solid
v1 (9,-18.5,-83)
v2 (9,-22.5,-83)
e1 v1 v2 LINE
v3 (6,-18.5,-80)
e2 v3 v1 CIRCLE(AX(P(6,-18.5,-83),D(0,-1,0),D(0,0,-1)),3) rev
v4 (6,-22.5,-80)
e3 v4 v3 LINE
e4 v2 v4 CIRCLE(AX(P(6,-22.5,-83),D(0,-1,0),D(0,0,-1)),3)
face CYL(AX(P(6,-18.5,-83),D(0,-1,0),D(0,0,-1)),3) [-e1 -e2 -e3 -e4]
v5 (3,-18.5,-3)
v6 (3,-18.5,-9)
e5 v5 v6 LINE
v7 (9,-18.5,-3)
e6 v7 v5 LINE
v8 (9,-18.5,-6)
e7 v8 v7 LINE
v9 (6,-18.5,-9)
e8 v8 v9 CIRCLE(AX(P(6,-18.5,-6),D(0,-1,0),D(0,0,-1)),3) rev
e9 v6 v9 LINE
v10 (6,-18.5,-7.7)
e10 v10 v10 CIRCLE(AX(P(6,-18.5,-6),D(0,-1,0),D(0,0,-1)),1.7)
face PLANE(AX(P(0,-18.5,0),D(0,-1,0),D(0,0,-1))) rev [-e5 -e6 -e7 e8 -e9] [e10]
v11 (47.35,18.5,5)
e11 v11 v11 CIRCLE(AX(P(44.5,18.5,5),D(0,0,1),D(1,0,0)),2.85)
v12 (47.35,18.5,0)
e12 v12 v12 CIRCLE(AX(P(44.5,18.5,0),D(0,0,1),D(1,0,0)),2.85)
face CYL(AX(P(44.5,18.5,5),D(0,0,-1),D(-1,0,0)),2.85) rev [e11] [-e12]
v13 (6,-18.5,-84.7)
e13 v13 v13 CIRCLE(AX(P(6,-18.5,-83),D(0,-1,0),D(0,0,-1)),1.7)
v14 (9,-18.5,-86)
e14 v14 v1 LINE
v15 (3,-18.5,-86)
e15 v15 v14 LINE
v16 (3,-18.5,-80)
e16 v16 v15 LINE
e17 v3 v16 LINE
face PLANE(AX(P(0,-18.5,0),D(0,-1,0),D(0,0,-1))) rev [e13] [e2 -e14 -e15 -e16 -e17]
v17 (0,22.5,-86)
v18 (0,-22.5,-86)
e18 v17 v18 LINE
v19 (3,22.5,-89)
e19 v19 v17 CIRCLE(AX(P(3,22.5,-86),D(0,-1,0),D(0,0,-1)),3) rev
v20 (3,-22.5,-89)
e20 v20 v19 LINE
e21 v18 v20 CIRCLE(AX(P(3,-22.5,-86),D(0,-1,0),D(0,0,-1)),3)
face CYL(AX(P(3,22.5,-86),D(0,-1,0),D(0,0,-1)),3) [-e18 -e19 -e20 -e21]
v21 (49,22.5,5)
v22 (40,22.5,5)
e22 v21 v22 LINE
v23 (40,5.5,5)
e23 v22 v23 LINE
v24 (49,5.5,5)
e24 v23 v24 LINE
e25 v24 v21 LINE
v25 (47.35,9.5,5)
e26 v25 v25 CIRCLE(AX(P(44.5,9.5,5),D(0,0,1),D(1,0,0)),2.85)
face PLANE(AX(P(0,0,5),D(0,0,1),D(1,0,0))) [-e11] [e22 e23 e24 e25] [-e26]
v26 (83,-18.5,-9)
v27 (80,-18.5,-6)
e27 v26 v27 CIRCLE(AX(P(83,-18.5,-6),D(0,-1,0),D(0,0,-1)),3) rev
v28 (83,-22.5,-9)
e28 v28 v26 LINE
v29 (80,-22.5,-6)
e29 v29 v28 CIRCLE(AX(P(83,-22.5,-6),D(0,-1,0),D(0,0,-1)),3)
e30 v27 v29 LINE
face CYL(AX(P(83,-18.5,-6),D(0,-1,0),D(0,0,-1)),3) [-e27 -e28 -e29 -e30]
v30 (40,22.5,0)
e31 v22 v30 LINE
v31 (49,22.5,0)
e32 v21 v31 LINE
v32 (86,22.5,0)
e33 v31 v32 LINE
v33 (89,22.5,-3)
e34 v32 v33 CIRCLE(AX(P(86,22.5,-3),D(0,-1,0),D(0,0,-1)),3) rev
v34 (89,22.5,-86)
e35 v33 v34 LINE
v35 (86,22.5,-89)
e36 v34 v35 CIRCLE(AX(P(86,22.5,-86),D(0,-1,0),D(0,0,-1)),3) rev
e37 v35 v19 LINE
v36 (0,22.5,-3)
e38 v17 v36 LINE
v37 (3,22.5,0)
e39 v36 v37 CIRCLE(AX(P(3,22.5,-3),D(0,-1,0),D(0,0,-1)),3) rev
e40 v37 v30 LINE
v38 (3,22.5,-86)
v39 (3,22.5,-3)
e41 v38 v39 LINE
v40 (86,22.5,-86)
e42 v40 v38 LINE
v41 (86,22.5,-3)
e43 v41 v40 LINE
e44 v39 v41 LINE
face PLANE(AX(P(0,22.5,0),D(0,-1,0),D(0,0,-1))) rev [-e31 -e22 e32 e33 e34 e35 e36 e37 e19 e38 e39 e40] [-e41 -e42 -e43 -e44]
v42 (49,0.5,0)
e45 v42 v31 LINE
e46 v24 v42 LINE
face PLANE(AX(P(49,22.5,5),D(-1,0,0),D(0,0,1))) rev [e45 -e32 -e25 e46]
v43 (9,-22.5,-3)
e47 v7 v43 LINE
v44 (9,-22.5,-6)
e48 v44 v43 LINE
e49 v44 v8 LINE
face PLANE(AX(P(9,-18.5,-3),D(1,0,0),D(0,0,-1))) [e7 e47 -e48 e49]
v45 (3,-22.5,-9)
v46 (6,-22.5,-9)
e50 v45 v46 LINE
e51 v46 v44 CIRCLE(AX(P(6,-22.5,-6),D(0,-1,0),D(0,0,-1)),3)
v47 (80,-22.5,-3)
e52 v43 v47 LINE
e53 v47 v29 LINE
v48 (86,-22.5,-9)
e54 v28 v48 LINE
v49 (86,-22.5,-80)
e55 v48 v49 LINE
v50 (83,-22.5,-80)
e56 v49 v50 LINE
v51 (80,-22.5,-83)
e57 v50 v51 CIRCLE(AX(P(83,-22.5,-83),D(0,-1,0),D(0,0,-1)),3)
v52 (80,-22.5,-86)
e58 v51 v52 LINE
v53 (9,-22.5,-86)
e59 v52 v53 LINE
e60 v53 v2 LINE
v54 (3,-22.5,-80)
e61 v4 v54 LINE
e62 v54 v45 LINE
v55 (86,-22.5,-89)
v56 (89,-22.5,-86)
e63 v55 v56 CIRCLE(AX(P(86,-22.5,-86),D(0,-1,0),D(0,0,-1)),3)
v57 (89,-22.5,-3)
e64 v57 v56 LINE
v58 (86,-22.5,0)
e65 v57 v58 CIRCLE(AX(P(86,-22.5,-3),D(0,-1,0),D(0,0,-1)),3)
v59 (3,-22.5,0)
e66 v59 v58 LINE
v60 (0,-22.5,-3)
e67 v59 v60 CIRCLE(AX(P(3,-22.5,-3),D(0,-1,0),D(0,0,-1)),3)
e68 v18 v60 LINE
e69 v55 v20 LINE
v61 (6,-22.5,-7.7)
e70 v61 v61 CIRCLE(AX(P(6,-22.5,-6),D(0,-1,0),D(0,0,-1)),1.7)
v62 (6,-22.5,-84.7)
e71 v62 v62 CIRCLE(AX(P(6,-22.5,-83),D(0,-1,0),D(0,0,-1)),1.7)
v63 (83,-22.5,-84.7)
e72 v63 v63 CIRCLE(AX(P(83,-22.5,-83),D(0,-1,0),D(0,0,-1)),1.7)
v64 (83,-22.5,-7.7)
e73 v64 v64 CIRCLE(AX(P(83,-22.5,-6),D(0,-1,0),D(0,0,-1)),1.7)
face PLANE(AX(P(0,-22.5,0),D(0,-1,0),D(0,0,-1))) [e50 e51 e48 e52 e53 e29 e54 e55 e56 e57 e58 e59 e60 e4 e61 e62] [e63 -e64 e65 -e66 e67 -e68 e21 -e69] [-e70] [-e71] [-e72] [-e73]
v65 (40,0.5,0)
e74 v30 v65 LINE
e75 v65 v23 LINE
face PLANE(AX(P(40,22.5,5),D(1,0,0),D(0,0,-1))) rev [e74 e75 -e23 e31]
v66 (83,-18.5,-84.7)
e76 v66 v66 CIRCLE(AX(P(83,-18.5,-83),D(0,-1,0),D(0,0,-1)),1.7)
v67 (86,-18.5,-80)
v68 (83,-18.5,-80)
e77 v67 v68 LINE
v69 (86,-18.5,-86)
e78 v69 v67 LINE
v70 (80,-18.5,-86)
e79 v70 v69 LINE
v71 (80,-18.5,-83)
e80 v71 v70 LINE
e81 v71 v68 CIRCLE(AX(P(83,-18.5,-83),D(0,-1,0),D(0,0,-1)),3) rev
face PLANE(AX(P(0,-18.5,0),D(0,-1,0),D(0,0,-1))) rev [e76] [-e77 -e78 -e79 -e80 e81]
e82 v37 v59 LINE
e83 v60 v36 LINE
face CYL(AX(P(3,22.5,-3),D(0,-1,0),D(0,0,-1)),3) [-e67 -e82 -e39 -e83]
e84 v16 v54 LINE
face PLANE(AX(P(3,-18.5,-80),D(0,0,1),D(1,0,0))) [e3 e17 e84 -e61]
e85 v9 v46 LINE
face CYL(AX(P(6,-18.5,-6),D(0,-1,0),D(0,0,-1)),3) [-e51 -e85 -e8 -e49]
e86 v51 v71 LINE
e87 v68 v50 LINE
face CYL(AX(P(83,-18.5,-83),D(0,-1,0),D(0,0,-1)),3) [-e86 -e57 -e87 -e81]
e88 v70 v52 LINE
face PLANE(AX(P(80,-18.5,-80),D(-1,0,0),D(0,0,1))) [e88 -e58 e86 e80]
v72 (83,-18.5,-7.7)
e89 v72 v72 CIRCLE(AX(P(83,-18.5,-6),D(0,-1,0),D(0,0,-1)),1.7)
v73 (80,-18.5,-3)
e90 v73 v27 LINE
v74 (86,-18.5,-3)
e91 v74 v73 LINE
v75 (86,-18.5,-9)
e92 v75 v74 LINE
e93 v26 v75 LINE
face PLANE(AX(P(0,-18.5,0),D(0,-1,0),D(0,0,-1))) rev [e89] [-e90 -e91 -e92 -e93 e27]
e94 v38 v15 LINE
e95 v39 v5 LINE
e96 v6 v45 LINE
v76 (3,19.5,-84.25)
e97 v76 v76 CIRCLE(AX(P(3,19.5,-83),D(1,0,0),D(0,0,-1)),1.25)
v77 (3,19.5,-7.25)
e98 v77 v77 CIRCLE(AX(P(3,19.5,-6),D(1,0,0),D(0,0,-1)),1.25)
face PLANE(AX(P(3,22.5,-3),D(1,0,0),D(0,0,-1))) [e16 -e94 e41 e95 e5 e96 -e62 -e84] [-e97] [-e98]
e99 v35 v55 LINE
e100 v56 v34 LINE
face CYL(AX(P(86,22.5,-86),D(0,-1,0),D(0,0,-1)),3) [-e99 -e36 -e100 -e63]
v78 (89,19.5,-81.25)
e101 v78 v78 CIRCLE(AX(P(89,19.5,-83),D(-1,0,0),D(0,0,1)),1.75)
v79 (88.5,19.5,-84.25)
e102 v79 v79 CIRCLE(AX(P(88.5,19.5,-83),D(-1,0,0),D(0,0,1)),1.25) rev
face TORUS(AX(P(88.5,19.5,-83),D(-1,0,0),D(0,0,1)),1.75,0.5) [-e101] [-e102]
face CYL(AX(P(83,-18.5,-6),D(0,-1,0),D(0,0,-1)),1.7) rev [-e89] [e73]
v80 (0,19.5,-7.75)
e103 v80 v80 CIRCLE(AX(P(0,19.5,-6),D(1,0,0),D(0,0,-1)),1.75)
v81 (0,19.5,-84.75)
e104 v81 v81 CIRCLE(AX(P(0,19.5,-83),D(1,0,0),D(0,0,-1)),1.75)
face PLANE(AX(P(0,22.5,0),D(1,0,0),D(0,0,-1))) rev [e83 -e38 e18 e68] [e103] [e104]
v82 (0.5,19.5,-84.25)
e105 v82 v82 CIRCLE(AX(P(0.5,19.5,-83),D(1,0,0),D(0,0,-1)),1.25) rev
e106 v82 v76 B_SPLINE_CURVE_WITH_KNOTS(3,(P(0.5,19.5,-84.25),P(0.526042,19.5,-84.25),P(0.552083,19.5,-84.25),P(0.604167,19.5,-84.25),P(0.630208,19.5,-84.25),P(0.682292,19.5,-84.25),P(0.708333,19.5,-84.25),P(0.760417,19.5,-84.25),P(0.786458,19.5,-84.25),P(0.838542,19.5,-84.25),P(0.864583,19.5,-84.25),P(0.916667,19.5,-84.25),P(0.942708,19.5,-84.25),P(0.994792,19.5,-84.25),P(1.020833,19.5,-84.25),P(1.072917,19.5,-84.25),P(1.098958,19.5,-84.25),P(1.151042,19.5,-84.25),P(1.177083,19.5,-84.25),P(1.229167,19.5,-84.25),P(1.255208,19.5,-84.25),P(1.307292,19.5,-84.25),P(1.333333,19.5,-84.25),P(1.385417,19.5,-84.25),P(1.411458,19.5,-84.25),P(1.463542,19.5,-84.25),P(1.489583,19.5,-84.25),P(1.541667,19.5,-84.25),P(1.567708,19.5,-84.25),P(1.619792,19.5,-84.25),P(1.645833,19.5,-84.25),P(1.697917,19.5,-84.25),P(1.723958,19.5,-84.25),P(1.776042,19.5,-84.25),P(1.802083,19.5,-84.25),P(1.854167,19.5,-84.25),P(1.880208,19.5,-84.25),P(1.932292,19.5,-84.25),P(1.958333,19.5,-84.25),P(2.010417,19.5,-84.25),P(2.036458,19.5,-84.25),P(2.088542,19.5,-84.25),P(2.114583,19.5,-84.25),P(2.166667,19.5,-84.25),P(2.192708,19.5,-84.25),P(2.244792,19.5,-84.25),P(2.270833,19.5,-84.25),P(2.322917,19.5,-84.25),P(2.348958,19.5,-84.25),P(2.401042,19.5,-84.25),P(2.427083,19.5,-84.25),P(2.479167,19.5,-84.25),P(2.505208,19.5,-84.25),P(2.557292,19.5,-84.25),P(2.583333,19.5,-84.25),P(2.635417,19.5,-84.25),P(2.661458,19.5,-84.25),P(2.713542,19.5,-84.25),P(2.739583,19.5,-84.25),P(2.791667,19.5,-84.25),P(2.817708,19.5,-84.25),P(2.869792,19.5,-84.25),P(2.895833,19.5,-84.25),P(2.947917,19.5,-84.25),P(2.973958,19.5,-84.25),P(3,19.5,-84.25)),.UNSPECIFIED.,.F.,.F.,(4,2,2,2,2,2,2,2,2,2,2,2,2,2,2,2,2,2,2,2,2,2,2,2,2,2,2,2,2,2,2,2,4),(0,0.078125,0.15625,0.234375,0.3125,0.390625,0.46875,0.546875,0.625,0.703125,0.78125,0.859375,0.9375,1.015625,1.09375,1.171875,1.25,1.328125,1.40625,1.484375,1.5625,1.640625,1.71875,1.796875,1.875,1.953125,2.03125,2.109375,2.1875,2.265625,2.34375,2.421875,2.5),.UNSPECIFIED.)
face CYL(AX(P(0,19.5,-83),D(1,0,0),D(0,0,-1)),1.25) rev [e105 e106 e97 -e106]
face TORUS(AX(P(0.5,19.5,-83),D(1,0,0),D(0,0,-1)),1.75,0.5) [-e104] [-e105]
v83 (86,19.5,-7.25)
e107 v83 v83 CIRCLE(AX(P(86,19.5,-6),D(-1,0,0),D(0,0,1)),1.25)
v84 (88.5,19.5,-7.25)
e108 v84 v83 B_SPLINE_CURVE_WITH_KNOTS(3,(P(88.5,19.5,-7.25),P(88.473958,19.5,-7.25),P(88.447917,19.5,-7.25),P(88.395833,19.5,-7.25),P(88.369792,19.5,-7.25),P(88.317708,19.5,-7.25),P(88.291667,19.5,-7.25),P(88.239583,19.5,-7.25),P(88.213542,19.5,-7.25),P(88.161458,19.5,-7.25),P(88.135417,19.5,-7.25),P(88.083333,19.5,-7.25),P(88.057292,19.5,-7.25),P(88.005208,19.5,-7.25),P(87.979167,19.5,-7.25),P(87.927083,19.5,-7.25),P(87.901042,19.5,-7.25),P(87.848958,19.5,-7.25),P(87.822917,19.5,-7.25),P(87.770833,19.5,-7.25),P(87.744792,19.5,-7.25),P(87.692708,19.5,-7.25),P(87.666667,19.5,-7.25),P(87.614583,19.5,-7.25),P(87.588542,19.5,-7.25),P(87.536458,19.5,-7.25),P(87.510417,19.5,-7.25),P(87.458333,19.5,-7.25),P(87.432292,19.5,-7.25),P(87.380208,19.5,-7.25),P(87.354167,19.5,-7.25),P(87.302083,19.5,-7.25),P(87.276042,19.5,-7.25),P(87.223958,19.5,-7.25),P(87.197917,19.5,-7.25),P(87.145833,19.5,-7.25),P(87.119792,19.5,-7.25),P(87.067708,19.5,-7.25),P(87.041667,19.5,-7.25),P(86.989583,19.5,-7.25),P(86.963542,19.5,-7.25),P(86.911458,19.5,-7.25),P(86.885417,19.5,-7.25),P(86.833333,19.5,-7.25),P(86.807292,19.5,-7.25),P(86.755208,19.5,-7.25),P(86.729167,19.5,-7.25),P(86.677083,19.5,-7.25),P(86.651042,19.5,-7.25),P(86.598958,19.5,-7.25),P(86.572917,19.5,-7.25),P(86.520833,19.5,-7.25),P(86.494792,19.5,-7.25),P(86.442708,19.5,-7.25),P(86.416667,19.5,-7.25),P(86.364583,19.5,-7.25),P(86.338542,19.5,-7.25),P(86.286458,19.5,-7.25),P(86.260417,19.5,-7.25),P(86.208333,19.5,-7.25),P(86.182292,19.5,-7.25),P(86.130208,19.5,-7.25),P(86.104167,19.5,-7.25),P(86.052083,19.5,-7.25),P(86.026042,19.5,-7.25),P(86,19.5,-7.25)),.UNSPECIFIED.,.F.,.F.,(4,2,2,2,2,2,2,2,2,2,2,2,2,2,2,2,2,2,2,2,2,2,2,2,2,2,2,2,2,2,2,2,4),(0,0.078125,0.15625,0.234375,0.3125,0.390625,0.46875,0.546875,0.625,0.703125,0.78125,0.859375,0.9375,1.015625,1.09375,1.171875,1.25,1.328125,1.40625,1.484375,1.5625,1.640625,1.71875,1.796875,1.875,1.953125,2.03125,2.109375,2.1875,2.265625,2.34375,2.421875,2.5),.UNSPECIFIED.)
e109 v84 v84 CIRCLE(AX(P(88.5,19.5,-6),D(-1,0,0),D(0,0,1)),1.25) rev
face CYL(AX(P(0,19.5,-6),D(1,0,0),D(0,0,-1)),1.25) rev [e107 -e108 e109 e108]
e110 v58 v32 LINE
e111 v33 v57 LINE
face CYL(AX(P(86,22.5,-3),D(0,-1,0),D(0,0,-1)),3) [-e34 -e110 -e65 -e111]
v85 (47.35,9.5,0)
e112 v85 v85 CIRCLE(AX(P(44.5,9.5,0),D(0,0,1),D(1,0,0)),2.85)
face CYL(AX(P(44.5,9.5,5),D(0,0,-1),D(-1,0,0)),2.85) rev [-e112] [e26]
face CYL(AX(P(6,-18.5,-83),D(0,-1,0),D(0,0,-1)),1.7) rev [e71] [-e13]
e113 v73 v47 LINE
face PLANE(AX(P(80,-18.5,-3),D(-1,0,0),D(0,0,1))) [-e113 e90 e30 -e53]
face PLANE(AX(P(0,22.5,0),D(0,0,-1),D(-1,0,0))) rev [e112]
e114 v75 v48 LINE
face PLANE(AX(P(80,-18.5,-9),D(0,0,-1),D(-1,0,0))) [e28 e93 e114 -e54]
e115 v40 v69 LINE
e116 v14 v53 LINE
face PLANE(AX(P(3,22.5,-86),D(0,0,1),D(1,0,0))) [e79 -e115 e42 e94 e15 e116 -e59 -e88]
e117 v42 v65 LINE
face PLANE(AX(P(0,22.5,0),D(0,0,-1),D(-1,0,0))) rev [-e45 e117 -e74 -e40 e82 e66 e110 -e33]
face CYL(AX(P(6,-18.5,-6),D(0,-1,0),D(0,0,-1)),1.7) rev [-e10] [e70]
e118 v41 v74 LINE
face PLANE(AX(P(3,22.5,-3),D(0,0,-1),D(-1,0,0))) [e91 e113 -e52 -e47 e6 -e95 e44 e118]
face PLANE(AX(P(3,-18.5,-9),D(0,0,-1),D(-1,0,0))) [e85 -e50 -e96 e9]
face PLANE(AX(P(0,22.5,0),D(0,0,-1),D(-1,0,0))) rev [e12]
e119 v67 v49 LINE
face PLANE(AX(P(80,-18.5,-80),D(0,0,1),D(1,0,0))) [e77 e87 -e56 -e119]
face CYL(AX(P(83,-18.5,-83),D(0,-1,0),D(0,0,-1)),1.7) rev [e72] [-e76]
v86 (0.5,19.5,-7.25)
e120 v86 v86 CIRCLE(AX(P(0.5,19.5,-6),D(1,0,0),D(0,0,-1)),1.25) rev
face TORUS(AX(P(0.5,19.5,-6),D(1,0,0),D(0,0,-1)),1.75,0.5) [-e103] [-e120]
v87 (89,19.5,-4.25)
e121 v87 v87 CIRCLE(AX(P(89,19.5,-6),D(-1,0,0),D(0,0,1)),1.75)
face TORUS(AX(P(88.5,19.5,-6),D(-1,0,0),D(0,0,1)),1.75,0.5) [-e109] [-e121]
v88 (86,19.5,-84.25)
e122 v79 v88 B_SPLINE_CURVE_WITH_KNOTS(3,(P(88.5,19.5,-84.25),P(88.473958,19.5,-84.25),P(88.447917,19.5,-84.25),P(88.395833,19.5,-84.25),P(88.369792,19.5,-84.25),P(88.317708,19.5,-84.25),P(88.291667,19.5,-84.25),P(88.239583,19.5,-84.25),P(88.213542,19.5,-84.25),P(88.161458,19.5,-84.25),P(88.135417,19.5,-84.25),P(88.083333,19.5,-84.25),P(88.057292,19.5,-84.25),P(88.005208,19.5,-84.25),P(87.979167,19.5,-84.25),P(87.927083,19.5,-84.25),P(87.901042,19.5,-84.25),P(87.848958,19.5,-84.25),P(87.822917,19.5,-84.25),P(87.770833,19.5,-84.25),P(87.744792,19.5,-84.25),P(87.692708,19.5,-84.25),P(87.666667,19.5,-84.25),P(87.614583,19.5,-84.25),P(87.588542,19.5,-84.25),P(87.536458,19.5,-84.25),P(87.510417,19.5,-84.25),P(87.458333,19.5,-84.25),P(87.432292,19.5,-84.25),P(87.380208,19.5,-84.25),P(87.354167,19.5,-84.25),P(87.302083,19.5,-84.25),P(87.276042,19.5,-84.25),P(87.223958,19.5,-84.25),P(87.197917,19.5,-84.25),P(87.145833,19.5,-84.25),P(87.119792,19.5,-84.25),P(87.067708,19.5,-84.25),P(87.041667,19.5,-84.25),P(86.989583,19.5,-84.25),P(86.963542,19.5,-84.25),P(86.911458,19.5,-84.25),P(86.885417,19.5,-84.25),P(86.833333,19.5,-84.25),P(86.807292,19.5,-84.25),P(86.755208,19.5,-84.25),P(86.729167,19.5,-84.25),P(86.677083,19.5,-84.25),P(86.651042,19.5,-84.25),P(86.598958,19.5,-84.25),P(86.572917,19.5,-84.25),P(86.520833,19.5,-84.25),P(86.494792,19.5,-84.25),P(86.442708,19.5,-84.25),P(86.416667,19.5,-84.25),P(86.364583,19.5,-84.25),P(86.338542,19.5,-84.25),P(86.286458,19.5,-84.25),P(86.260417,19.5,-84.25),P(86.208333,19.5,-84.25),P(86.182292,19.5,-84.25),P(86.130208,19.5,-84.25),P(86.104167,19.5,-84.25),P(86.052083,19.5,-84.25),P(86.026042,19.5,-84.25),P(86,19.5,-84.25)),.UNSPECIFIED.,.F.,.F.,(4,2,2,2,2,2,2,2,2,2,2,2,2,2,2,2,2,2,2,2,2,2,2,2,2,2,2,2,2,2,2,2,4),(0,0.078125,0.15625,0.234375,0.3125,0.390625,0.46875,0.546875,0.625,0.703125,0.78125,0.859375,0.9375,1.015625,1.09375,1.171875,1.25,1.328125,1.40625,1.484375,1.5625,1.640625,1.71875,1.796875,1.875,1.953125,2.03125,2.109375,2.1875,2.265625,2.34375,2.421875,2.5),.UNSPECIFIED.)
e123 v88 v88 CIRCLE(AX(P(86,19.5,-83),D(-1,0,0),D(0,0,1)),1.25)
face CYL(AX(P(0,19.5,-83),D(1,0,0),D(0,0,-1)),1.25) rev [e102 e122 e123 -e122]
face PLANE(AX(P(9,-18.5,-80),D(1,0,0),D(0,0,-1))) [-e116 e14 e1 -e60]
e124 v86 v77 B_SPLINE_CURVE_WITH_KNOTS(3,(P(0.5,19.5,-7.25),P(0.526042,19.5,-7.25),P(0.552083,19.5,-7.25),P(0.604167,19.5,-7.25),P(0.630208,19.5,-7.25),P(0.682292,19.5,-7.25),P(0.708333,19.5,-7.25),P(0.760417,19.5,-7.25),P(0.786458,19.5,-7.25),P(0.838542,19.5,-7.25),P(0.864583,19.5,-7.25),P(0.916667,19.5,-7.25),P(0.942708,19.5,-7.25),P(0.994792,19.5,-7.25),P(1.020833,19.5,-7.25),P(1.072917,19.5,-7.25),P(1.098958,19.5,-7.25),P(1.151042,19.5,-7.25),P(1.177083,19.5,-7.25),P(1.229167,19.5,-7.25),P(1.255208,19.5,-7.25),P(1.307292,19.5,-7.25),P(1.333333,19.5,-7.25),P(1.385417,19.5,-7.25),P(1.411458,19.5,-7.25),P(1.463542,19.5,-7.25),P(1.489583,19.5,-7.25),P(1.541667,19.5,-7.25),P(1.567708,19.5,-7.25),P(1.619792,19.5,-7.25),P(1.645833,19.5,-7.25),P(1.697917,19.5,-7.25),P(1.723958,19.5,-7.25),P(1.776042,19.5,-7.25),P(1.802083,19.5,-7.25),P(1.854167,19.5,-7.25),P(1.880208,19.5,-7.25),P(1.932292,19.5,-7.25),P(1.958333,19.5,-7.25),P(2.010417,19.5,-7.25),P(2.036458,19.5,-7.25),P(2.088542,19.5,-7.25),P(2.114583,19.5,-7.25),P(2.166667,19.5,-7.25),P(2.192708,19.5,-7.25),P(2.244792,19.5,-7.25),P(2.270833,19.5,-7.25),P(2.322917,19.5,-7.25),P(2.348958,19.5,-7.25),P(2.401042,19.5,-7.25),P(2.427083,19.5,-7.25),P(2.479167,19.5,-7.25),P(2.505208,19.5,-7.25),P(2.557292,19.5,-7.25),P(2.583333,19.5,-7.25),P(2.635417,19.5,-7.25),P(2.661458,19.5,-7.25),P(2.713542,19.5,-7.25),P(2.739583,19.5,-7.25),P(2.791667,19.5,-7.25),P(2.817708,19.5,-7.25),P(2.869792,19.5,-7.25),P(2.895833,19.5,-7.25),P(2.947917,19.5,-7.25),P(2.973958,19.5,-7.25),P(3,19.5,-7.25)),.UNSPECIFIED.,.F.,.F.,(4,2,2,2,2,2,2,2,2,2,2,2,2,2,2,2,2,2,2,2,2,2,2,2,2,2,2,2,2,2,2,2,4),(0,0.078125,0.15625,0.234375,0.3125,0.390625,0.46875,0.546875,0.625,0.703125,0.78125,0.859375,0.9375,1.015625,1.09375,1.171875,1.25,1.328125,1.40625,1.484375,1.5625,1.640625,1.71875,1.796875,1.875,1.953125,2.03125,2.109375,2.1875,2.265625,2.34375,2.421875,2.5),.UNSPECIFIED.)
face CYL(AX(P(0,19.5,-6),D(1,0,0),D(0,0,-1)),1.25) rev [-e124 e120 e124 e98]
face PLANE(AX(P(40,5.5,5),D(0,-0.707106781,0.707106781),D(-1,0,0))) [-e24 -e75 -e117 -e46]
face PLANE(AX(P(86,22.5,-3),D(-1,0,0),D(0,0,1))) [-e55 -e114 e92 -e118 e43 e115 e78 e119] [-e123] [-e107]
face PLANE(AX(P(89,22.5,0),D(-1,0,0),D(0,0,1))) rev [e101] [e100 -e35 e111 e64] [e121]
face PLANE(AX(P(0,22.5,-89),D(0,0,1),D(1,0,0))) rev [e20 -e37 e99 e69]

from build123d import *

# Parameters (mm, degrees)
SKETCH1_W           = 89
SKETCH1_H           = 89
SKETCH1_W_2         = 83
SKETCH1_H_2         = 83
BOSS_EXTRUDE1_DEPTH = 22.5
SKETCH4_W           = 6
SKETCH4_H           = 6
SKETCH4_R           = 1.7
BOSS_EXTRUDE3_DEPTH = 4
FILLET3_R           = 3
SKETCH6_W           = 9
SKETCH6_H           = 17
SKETCH6_R           = 2.85
BOSS_EXTRUDE4_DEPTH = 5
CHAMFER1_SIZE       = 5
FILLET4_R           = 3
SKETCH7_R           = 1.25
CUT_EXTRUDE1_DEPTH  = 128.860275301
FILLET5_R           = 0.5


with BuildPart() as part:
    # Sketch1 → Boss-Extrude1 (new, symmetric)
    with BuildSketch(Plane(origin=(0, 0, 0), x_dir=(1, 0, 0), z_dir=(0, 1, 0))):
        with Locations((44.5, 44.5)):
            Rectangle(SKETCH1_W, SKETCH1_H)
        with Locations((44.5, 44.5)):
            Rectangle(SKETCH1_W_2, SKETCH1_H_2, mode=Mode.SUBTRACT)
    extrude(amount=BOSS_EXTRUDE1_DEPTH, both=True)

    # Sketch4 → Boss-Extrude3 (add)
    # profile 1 of 4: a face of its own
    with BuildSketch(Plane.XZ.offset(22.5)):
        with Locations((83, -6)):
            Rectangle(SKETCH4_W, SKETCH4_H)
        with Locations(Location((83, -6, 0), (0, 0, 270))):
            Circle(SKETCH4_R, mode=Mode.SUBTRACT)
    # profile 2 of 4: a face of its own
    with BuildSketch(Plane.XZ.offset(22.5)):
        with Locations((6, -6)):
            Rectangle(SKETCH4_W, SKETCH4_H)
        with Locations(Location((6, -6, 0), (0, 0, 270))):
            Circle(SKETCH4_R, mode=Mode.SUBTRACT)
    # profile 3 of 4: a face of its own
    with BuildSketch(Plane.XZ.offset(22.5)):
        with Locations((83, -83)):
            Rectangle(SKETCH4_W, SKETCH4_H)
        with Locations(Location((83, -83, 0), (0, 0, 270))):
            Circle(SKETCH4_R, mode=Mode.SUBTRACT)
    # profile 4 of 4: a face of its own
    with BuildSketch(Plane.XZ.offset(22.5)):
        with Locations((6, -83)):
            Rectangle(SKETCH4_W, SKETCH4_H)
        with Locations(Location((6, -83, 0), (0, 0, 270))):
            Circle(SKETCH4_R, mode=Mode.SUBTRACT)
    extrude(amount=-BOSS_EXTRUDE3_DEPTH)

    # Fillet3
    fillet3_edges = [part.edges().sort_by_distance(p)[0] for p in [
        (9, -20.5, -9),
        (80, -20.5, -9),
        (9, -20.5, -80),
        (80, -20.5, -80),
    ]]
    fillet(fillet3_edges, radius=FILLET3_R)

    # Sketch6 → Boss-Extrude4 (add)
    with BuildSketch(Plane.XY):
        with Locations((44.5, 14)):
            Rectangle(SKETCH6_W, SKETCH6_H)
        with Locations((44.5, 18.5)):
            Circle(SKETCH6_R, mode=Mode.SUBTRACT)
        with Locations((44.5, 9.5)):
            Circle(SKETCH6_R, mode=Mode.SUBTRACT)
    extrude(amount=BOSS_EXTRUDE4_DEPTH)

    # Chamfer1
    chamfer1_edges = [part.edges().sort_by_distance(p)[0] for p in [
        (44.5, 5.5, 0),
    ]]
    chamfer(chamfer1_edges, length=CHAMFER1_SIZE - 0.0001)  # a hair under: the kernel refuses the full size

    # Fillet4
    fillet4_edges = [part.edges().sort_by_distance(p)[0] for p in [
        (0, 0, -89),
        (89, 0, -89),
        (89, 0, 0),
        (0, 0, 0),
    ]]
    fillet(fillet4_edges, radius=FILLET4_R)

    # Sketch7 → Cut-Extrude1 (cut, through all)
    with BuildSketch(Plane(origin=(89, 0, 0), x_dir=(0, 0, -1), z_dir=(1, 0, 0))):
        with Locations((83, 19.5)):
            Circle(SKETCH7_R)
        with Locations((6, 19.5)):
            Circle(SKETCH7_R)
    extrude(amount=-CUT_EXTRUDE1_DEPTH, mode=Mode.SUBTRACT)

    # Fillet5
    fillet5_edges = [part.edges().sort_by_distance(p)[0] for p in [
        (0, 19.5, -81.75),
        (89, 19.5, -81.75),
        (0, 19.5, -4.75),
        (89, 19.5, -4.75),
    ]]
    fillet(fillet5_edges, radius=FILLET5_R)


solid = part.part
